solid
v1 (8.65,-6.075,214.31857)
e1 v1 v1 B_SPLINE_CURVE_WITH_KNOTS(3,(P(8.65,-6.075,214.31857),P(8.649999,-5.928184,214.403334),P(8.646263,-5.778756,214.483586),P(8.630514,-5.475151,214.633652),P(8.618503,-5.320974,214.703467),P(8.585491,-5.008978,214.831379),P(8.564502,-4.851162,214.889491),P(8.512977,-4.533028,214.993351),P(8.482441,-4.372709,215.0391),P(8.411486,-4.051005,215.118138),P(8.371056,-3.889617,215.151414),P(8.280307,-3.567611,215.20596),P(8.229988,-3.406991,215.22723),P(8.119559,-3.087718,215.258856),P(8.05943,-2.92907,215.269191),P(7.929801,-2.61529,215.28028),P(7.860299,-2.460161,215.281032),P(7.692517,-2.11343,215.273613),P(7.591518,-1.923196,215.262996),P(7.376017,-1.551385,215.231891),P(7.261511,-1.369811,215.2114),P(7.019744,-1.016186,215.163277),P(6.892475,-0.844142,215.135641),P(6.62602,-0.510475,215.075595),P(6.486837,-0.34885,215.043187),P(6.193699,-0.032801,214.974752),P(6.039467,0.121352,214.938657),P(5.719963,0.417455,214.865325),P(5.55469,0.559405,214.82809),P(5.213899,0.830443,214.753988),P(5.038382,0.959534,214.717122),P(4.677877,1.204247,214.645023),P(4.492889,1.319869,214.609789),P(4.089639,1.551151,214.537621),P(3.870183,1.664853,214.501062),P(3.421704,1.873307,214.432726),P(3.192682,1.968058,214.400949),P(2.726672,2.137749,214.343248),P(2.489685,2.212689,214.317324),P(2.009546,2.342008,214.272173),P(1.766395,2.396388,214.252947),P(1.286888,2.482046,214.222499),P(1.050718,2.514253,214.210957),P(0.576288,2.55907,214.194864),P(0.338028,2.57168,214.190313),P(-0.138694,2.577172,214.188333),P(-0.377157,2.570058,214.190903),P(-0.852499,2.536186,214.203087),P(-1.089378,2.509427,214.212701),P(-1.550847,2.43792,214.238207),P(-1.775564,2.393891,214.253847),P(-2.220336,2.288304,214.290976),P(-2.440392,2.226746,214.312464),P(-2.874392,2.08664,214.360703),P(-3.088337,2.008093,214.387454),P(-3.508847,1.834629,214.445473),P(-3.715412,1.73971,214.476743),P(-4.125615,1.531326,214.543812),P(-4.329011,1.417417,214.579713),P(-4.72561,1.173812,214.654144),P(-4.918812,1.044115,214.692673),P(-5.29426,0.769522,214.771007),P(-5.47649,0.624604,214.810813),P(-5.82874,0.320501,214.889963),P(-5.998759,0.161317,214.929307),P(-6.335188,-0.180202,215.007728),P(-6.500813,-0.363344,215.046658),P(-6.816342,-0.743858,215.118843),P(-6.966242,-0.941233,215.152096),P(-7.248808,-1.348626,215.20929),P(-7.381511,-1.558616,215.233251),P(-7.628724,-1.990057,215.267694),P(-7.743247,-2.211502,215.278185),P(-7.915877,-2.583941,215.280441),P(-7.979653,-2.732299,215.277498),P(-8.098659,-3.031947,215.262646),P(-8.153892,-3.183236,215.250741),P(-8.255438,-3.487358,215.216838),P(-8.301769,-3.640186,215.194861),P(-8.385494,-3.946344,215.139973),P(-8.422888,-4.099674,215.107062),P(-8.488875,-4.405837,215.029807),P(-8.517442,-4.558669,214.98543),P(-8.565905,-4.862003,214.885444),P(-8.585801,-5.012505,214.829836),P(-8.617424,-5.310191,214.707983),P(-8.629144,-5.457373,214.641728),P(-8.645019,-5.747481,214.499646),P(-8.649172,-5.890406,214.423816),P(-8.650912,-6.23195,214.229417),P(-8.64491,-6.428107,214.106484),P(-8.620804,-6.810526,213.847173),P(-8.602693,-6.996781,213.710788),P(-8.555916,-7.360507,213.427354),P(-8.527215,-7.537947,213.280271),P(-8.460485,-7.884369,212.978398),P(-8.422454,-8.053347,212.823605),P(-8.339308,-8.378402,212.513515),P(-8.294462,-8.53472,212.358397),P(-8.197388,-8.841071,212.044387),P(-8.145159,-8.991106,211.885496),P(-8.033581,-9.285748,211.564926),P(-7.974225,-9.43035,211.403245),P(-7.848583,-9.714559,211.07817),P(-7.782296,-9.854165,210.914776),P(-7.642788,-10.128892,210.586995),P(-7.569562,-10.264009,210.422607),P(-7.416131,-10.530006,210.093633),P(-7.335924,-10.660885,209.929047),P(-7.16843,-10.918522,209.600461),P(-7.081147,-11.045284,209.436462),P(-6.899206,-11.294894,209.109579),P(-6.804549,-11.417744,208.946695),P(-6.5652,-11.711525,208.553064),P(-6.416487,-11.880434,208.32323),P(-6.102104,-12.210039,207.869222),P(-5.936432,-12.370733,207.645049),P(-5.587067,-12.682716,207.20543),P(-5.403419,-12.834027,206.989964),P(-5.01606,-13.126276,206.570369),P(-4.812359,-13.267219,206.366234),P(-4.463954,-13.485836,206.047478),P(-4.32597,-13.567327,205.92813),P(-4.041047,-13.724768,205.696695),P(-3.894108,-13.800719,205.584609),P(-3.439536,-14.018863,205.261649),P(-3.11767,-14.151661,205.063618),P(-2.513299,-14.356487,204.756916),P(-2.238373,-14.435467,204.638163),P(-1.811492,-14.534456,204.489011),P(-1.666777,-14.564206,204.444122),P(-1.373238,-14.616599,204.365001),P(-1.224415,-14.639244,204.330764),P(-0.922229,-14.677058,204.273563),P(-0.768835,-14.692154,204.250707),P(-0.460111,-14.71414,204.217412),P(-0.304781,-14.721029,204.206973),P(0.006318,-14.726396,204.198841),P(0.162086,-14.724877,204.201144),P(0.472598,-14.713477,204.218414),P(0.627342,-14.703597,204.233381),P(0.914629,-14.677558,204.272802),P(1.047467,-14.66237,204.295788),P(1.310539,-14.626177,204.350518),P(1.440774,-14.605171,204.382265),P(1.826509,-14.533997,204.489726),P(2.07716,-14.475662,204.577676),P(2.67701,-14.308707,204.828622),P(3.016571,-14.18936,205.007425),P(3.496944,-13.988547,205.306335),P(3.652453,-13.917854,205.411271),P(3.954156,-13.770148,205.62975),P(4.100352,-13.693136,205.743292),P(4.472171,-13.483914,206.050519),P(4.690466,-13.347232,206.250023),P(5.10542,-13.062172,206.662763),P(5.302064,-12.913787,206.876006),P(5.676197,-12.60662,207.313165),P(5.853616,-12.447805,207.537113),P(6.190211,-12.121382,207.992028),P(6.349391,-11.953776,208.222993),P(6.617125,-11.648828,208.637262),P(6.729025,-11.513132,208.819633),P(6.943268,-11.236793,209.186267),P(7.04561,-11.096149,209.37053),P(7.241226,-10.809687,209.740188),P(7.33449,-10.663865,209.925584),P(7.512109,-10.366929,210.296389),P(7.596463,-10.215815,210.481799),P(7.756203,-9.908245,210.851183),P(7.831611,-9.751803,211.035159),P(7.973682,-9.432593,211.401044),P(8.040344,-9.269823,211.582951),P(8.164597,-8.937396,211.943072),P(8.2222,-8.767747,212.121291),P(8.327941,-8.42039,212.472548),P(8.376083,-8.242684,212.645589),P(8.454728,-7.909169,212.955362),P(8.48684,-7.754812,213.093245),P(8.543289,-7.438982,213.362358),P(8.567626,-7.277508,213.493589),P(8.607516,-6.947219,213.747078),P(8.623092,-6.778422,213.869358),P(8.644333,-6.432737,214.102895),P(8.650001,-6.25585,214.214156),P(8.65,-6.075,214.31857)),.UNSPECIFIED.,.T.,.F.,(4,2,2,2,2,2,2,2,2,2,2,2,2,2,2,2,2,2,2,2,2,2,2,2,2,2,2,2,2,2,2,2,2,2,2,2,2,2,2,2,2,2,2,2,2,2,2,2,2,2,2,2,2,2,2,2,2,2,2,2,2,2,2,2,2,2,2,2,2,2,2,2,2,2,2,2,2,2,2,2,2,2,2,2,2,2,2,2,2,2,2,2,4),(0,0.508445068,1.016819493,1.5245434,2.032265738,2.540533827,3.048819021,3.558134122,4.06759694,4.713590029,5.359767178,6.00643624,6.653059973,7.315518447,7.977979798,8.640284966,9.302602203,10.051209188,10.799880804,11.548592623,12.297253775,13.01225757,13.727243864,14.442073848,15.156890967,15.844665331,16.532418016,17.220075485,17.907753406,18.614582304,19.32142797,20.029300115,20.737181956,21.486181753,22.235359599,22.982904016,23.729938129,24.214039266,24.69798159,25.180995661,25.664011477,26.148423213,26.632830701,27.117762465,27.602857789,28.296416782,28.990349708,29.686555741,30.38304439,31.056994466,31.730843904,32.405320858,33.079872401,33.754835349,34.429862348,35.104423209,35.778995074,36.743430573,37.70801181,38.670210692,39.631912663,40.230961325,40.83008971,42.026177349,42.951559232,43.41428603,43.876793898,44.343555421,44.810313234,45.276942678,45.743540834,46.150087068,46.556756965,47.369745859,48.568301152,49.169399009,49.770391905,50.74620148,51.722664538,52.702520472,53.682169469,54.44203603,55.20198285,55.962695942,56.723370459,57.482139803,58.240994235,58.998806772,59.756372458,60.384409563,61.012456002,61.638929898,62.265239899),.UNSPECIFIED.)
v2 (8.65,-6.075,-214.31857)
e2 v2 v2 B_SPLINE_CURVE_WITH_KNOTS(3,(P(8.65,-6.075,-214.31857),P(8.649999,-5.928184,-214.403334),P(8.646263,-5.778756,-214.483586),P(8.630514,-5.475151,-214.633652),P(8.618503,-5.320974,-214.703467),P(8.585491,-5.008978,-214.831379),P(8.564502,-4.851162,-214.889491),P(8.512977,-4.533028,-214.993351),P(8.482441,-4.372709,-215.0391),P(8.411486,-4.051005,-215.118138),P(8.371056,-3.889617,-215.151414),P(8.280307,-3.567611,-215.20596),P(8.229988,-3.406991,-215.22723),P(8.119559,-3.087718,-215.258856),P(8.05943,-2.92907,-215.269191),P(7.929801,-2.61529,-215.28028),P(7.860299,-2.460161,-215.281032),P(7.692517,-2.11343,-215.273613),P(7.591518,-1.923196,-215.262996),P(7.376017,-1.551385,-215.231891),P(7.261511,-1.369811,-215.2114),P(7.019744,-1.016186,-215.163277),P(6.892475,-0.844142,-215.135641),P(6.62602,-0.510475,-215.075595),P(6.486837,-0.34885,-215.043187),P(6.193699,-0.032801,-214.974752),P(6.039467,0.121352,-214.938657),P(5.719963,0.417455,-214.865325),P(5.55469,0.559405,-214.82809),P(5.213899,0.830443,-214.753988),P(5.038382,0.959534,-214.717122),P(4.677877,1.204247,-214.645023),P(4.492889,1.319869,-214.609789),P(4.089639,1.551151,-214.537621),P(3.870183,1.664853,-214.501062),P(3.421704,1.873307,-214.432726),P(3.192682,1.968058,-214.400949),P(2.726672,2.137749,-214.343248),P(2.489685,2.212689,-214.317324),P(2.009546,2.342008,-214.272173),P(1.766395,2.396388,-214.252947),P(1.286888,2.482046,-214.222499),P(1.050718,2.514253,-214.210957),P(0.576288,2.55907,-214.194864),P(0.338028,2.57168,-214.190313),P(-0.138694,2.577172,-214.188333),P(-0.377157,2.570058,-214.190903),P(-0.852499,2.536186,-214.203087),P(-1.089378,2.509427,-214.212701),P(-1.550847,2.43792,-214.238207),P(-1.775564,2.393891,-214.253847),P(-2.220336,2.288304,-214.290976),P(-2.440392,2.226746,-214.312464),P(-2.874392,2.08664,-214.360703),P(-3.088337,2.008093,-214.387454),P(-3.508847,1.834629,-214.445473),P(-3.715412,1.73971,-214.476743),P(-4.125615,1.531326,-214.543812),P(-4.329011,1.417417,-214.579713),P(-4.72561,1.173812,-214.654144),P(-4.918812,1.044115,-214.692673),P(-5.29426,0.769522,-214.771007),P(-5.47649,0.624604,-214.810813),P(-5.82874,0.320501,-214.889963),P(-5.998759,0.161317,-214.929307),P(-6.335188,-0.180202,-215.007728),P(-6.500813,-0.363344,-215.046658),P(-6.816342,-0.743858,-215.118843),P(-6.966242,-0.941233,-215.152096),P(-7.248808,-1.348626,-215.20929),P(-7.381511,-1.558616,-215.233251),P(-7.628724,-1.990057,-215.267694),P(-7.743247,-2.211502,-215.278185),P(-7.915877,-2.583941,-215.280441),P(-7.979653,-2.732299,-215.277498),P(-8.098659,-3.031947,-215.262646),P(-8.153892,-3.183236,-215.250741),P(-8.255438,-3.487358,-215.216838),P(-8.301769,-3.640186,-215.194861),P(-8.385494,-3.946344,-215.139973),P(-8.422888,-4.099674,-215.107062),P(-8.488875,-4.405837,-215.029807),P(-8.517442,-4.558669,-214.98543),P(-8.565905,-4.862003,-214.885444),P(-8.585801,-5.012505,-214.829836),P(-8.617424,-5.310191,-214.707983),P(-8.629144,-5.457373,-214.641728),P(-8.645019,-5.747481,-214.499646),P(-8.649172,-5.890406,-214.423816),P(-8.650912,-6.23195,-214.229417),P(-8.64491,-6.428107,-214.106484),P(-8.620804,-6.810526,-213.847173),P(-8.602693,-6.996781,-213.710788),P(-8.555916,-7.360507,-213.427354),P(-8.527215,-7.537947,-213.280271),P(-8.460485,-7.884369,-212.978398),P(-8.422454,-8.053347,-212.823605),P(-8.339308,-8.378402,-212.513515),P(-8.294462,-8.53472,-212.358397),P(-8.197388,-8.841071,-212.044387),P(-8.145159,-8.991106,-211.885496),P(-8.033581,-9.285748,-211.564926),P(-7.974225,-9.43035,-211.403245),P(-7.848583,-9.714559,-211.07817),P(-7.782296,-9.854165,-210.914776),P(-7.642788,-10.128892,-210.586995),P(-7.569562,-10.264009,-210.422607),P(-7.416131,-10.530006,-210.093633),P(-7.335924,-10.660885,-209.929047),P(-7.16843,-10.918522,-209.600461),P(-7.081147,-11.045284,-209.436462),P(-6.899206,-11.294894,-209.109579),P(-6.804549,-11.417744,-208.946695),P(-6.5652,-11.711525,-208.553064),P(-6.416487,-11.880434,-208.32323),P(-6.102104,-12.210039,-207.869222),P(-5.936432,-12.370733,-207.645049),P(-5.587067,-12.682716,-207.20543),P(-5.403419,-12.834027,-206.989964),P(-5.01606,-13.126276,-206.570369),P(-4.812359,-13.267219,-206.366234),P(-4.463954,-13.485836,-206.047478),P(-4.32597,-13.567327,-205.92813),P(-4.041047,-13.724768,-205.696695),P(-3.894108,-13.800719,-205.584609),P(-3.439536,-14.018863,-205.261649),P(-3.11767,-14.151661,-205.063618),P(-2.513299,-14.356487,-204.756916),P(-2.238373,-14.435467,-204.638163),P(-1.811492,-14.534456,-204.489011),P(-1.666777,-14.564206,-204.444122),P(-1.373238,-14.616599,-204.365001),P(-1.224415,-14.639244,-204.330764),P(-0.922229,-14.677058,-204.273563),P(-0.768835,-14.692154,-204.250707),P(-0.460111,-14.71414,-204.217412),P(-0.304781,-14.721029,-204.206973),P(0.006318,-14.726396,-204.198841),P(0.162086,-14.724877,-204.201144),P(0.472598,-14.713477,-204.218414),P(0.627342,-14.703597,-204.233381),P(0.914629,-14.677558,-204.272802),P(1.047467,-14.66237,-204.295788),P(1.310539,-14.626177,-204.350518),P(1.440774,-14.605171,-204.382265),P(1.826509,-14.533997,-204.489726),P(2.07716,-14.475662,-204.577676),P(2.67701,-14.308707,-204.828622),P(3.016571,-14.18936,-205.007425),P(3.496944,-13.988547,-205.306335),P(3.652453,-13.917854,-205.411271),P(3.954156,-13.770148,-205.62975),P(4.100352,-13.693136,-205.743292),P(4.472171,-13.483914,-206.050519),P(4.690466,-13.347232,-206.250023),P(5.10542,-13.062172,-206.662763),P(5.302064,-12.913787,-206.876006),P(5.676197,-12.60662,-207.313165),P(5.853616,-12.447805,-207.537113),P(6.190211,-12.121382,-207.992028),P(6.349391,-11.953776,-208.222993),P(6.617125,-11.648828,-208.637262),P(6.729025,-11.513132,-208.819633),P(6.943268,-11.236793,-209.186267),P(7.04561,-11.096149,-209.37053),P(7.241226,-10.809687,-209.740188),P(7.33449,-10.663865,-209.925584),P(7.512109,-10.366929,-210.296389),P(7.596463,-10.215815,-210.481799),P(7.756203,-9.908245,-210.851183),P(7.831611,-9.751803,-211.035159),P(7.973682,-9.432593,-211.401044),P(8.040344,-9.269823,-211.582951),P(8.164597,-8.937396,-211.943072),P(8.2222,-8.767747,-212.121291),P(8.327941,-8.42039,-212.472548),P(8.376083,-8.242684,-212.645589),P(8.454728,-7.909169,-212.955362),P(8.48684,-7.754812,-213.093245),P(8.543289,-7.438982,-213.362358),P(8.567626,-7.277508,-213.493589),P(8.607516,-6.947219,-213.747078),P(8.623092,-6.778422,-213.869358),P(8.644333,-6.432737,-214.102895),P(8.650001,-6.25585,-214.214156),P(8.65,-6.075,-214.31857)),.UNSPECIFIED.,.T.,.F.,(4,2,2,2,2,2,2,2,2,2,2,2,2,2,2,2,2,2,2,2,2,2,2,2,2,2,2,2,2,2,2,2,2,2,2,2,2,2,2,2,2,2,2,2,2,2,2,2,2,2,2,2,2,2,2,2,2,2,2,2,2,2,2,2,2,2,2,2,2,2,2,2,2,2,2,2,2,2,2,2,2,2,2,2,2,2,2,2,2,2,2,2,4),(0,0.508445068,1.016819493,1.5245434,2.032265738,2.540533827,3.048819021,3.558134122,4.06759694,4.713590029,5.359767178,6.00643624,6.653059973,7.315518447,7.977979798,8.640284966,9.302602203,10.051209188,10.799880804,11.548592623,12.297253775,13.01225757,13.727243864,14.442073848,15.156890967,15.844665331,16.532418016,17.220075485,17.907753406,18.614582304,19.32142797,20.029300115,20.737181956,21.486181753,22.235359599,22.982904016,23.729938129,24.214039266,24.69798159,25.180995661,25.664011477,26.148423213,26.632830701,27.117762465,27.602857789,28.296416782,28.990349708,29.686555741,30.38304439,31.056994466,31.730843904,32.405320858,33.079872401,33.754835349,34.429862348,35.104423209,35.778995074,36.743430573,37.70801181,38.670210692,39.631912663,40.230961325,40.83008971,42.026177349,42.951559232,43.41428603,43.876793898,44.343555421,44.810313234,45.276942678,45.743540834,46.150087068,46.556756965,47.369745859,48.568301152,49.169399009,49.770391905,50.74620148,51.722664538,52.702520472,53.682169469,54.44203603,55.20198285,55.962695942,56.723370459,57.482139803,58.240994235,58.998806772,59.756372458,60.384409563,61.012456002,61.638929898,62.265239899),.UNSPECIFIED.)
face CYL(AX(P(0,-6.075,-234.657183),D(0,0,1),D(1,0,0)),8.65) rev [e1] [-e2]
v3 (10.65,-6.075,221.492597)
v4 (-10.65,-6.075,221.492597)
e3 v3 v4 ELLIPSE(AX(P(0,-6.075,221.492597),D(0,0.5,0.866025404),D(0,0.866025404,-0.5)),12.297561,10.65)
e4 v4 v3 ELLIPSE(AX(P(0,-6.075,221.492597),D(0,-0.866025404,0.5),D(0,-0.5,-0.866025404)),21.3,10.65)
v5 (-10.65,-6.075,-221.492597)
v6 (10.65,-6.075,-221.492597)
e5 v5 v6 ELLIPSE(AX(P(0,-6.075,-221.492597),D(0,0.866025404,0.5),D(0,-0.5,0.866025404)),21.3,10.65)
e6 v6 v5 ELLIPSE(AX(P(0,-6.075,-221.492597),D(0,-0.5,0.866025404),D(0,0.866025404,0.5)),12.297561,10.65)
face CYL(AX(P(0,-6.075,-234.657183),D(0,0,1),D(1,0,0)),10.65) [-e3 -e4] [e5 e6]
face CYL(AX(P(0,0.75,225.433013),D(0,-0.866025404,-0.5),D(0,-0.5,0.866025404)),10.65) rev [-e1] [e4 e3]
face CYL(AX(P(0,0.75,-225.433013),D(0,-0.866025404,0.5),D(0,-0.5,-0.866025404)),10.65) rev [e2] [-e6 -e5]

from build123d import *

# Parameters (mm, degrees)
EXTRUDE_START         = -221.492597215
EXTRUDE_1_OUTLINE_R   = 10.65
EXTRUDE_1_OUTLINE_R_2 = 8.65
EXTRUDE_1_DEPTH       = 221.492597215
EXTRUDE_START_2       = 86
EXTRUDE_1_2_DEPTH     = 30


with BuildPart() as part:
    # Бобышка-Вытянуть1: read off the stored shape, not the designer's step
    # Бобышка-Вытянуть1 outline → Бобышка-Вытянуть1 (new body)
    with BuildSketch(Plane.XY.offset(EXTRUDE_START)):
        with Locations((0, -6.075)):
            Circle(EXTRUDE_1_OUTLINE_R)
        with Locations((0, -6.075)):
            Circle(EXTRUDE_1_OUTLINE_R_2, mode=Mode.SUBTRACT)
    extrude(amount=EXTRUDE_1_DEPTH)

    # Extrude 1 2 outline → Extrude 1 2 (cut)
    with BuildSketch(Plane(origin=(0, 0, 0), x_dir=(1, 0, 0), z_dir=(0, 0.8660254037845095, -0.4999999999998773)).offset(EXTRUDE_START_2)):
        with BuildLine():
            ThreePointArc((-10.65, 194.855715851), (0, 184.205715851), (10.65, 194.855715851))
            Line((10.65, 194.855715851), (10.65, 202))
            Line((10.65, 202), (-10.65, 202))
            Line((-10.65, 202), (-10.65, 194.855715851))
        make_face()
    extrude(amount=EXTRUDE_1_2_DEPTH, mode=Mode.SUBTRACT)

    # Зеркальное отражение1: part across plane


with BuildPart() as part_1:
    add(part.part)
    add(part.part.mirror(Plane(origin=(0, -6.075, 0), x_dir=(1, 0, 0), z_dir=(0, 0, 1))))


solid = part_1.part
